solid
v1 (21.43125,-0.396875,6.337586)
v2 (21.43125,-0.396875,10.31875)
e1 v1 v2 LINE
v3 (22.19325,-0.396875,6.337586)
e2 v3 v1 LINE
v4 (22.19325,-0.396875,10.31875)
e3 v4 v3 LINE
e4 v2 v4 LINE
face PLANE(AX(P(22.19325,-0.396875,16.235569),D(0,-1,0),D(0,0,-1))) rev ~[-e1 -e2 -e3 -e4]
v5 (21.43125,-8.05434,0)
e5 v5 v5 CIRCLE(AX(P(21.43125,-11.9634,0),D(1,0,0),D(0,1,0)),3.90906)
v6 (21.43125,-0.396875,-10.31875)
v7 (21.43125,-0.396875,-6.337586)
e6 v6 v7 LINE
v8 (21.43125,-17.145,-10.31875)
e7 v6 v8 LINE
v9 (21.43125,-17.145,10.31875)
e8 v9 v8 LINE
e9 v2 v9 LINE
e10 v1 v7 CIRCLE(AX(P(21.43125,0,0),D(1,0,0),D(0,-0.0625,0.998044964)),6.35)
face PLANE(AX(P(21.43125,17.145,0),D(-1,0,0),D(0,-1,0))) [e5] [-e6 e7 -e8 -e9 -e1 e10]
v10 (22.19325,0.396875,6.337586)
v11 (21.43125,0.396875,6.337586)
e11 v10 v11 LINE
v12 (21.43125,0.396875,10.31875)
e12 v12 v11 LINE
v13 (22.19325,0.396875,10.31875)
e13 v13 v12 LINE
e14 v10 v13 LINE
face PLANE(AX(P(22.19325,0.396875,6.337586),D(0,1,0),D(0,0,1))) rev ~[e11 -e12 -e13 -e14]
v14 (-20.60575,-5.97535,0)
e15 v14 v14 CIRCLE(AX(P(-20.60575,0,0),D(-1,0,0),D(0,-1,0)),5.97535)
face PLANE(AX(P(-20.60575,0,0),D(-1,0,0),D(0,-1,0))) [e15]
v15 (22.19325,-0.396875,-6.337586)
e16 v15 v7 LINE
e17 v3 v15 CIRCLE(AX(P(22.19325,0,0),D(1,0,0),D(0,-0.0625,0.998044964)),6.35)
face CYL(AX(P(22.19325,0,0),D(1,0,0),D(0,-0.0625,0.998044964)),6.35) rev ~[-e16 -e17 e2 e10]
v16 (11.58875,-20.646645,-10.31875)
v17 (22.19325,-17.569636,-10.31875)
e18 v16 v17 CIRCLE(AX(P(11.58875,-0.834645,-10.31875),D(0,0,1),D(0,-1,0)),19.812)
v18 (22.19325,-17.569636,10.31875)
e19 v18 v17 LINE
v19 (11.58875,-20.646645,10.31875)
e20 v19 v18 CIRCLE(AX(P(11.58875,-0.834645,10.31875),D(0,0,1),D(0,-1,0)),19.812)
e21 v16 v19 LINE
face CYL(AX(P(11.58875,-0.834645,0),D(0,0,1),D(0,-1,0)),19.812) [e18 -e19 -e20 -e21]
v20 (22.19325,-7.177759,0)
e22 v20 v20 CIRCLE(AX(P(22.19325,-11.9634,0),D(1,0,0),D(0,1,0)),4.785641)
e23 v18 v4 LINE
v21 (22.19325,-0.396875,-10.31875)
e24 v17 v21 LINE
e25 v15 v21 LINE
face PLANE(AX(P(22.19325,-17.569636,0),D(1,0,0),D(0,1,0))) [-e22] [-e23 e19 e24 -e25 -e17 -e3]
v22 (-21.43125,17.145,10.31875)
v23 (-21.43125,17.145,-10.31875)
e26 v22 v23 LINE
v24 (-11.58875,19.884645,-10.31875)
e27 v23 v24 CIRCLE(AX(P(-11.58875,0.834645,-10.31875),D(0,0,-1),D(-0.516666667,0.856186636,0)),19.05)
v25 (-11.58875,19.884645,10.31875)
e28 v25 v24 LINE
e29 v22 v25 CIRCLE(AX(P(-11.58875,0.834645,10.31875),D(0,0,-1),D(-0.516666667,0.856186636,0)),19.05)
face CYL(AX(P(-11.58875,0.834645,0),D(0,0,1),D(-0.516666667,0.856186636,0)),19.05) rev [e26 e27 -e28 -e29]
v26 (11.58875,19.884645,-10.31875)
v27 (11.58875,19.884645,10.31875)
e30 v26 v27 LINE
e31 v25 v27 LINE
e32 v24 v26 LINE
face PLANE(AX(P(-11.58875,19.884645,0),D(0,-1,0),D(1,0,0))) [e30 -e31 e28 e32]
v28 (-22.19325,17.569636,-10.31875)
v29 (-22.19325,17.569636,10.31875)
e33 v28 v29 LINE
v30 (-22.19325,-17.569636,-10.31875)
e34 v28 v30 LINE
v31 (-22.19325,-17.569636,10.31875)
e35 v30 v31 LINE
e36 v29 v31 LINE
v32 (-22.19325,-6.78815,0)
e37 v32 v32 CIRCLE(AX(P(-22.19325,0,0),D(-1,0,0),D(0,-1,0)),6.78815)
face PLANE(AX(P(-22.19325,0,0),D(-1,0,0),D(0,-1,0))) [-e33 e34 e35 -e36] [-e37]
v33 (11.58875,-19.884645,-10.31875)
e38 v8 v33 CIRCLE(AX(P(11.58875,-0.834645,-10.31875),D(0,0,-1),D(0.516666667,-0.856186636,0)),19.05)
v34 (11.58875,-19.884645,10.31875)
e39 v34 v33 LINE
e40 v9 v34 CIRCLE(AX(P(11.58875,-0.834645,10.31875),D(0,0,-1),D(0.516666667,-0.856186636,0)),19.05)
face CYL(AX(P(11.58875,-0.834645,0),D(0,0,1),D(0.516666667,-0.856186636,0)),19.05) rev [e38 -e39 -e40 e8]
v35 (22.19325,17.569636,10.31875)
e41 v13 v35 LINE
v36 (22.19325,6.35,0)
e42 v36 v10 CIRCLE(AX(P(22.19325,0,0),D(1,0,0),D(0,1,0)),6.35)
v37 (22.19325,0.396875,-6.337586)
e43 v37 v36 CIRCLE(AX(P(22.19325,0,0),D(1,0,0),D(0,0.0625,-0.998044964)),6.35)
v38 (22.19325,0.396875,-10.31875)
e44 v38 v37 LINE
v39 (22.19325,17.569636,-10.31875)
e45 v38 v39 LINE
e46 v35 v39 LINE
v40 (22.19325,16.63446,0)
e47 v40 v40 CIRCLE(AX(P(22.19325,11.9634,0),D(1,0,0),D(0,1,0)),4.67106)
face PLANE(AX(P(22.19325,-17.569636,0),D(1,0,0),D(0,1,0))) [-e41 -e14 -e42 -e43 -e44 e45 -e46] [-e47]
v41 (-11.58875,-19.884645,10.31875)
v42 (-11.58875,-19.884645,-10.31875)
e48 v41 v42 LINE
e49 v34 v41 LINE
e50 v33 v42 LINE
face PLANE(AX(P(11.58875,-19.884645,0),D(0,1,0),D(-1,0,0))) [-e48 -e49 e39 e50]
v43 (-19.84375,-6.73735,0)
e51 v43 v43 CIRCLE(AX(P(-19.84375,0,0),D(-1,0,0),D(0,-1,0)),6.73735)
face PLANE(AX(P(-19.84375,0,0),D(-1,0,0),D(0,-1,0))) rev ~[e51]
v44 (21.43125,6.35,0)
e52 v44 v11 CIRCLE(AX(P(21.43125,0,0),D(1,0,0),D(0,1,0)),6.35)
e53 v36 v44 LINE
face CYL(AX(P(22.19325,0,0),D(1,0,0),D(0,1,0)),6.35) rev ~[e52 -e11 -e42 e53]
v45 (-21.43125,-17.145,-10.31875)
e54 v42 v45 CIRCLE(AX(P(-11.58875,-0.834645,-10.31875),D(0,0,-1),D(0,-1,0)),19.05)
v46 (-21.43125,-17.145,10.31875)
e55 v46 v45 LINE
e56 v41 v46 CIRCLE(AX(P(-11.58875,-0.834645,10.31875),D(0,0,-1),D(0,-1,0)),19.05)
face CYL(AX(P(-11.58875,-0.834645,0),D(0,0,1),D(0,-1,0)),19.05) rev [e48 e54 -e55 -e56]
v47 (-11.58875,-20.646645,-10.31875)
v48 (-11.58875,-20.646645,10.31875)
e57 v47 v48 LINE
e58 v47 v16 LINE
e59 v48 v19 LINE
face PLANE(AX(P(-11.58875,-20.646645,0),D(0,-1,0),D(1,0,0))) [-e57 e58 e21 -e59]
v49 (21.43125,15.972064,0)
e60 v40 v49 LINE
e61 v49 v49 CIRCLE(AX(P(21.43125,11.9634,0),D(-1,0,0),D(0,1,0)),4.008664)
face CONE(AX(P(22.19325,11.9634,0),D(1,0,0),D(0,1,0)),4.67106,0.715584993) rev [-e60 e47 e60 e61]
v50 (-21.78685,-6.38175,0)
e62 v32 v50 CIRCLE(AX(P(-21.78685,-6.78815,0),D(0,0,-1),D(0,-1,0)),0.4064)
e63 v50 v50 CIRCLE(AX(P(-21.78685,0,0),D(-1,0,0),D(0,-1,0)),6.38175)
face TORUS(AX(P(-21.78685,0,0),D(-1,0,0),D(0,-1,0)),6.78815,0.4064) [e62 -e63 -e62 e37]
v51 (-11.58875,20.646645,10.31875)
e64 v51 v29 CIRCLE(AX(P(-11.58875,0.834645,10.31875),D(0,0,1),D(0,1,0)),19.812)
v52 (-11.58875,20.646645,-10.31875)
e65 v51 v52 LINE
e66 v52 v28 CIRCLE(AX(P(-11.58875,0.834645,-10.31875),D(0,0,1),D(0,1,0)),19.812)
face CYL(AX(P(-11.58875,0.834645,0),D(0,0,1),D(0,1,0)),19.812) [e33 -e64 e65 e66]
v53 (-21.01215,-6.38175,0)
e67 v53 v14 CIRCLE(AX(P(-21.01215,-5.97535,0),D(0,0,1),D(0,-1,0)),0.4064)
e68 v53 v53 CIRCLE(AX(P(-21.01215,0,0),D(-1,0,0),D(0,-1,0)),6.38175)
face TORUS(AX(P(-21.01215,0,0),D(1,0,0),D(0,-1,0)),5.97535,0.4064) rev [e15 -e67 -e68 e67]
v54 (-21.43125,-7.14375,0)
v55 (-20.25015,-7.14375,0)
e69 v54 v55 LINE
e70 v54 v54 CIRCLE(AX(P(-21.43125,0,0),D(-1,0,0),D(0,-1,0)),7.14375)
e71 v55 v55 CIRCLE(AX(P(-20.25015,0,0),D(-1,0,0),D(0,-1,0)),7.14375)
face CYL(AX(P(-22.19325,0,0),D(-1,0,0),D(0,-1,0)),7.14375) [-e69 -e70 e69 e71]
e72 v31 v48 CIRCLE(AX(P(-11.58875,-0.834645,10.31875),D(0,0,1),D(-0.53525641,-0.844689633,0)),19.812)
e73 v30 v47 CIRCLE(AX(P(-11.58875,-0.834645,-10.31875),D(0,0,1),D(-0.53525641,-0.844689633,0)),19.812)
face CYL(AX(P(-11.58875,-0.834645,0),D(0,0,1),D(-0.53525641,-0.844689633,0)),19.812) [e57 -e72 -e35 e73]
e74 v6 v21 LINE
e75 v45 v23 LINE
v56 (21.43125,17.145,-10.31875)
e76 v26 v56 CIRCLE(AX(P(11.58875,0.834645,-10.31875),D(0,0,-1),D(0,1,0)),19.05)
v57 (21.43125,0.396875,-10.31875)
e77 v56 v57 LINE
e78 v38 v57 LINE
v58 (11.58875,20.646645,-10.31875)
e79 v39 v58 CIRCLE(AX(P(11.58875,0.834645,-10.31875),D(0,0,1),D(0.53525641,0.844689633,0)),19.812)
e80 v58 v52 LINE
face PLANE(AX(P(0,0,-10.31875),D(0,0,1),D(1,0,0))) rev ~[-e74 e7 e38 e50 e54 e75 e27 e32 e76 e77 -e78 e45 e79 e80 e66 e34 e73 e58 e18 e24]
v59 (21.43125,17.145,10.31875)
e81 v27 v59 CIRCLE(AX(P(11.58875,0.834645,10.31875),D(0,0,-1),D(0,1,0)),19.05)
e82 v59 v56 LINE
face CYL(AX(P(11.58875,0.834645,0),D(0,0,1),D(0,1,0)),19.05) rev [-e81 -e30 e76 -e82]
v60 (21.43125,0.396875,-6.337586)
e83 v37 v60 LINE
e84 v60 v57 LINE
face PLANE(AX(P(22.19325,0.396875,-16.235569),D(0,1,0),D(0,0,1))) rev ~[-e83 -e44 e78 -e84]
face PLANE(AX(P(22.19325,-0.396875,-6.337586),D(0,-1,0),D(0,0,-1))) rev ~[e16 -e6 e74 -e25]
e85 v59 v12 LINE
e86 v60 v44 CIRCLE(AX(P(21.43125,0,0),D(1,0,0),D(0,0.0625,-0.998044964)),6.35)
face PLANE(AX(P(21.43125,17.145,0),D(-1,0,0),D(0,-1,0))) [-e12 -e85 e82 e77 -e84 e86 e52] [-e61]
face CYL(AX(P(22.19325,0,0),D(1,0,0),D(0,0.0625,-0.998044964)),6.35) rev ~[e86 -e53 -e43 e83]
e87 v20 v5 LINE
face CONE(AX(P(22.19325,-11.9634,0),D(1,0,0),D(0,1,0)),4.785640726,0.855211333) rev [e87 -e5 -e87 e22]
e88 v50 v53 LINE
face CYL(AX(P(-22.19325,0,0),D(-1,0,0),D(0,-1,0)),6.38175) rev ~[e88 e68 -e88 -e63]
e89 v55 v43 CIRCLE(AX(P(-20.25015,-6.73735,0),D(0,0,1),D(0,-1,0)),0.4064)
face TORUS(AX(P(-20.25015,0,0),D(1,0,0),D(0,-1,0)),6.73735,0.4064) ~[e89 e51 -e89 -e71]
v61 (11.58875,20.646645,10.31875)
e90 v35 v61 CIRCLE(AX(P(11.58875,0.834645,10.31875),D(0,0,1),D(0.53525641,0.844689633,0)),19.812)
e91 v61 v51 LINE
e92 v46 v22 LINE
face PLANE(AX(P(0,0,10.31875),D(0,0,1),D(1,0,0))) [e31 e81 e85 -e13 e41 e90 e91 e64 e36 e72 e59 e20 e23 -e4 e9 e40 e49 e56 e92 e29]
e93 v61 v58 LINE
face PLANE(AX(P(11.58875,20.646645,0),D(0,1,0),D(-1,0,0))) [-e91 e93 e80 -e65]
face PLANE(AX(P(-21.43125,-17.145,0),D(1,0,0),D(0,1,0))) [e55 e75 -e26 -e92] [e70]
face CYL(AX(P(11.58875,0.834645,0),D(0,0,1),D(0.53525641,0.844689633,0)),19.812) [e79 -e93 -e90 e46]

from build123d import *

# Parameters (mm, degrees)
F1_DEPTH = 10.31875
F2_R     = 3.90906
F3_DEPTH = 25.4
F4_DEPTH = 25.4
F6_R     = 7.14375
F7_DEPTH = 2.3495
F8_R     = 6.38175
F9_DEPTH = 1.5875
F10_R    = 0.4064


# Not quite as in the source:
# - a fillet or chamfer that OpenCascade refuses, or shapes differently, is made with other operations: its cross-section is extruded or revolved along the edge and cut away or added


with BuildPart() as f1:
    # F0 (on Top) → F1 (new body, symmetric)
    with BuildSketch(Plane.XY):
        with BuildLine():
            Line((0, 20.6466445854), (-11.58875, 20.6466445854))
            ThreePointArc((-11.58875, 20.6466445854), (-17.1096965819, 19.861848606), (-22.19325, 17.5696355848))
            Line((-22.19325, 17.5696355848), (-22.19325, -17.5696355848))
            ThreePointArc((-22.19325, -17.5696355848), (-17.1096965819, -19.861848606), (-11.58875, -20.6466445854))
            Line((-11.58875, -20.6466445854), (0, -20.6466445854))
            Line((0, -20.6466445854), (11.58875, -20.6466445854))
            ThreePointArc((11.58875, -20.6466445854), (17.1096965819, -19.861848606), (22.19325, -17.5696355848))
            Line((22.19325, -17.5696355848), (22.19325, 17.5696355848))
            ThreePointArc((22.19325, 17.5696355848), (17.1096965819, 19.861848606), (11.58875, 20.6466445854))
            Line((11.58875, 20.6466445854), (0, 20.6466445854))
        make_face()
        with BuildLine():
            ThreePointArc((11.58875, 19.8846445854), (16.6970877606, 19.1869573913), (21.43125, 17.145))
            Line((21.43125, 17.145), (21.43125, -17.145))
            ThreePointArc((21.43125, -17.145), (16.6970877606, -19.1869573913), (11.58875, -19.8846445854))
            Line((11.58875, -19.8846445854), (0, -19.8846445854))
            Line((0, -19.8846445854), (-11.58875, -19.8846445854))
            ThreePointArc((-11.58875, -19.8846445854), (-16.6970877606, -19.1869573913), (-21.43125, -17.145))
            Line((-21.43125, -17.145), (-21.43125, 17.145))
            ThreePointArc((-21.43125, 17.145), (-16.6970877606, 19.1869573913), (-11.58875, 19.8846445854))
            Line((-11.58875, 19.8846445854), (0, 19.8846445854))
            Line((0, 19.8846445854), (11.58875, 19.8846445854))
        make_face(mode=Mode.SUBTRACT)
    extrude(amount=F1_DEPTH, both=True)

    # F2 (on face) → F3 (cut)
    with BuildSketch(Plane.YZ.offset(22.19325)):
        with BuildLine():
            ThreePointArc((0.396875, -6.3375855209), (4.6283180665, -4.3475478002), (6.35, 0))
            ThreePointArc((6.35, 0), (4.6283180665, 4.3475478002), (0.396875, 6.3375855209))
            Line((0.396875, 6.3375855209), (0.396875, -6.3375855209))
        make_face()
        with BuildLine():
            Line((0.396875, -6.3375855209), (0.396875, 6.3375855209))
            ThreePointArc((0.396875, 6.3375855209), (0, 6.35), (-0.396875, 6.3375855209))
            Line((-0.396875, 6.3375855209), (-0.396875, -6.3375855209))
            ThreePointArc((-0.396875, -6.3375855209), (0, -6.35), (0.396875, -6.3375855209))
        make_face()
        with BuildLine():
            ThreePointArc((-0.396875, 6.3375855209), (0, 6.35), (0.396875, 6.3375855209))
            Line((0.396875, 6.3375855209), (0.396875, 16.235569492))
            Line((0.396875, 16.235569492), (-0.396875, 16.235569492))
            Line((-0.396875, 16.235569492), (-0.396875, 6.3375855209))
        make_face()
        with BuildLine():
            Line((0.396875, -16.235569492), (0.396875, -6.3375855209))
            ThreePointArc((0.396875, -6.3375855209), (0, -6.35), (-0.396875, -6.3375855209))
            Line((-0.396875, -6.3375855209), (-0.396875, -16.235569492))
            Line((-0.396875, -16.235569492), (0.396875, -16.235569492))
        make_face()
        with BuildLine():
            Line((-0.396875, -6.3375855209), (-0.396875, 6.3375855209))
            ThreePointArc((-0.396875, 6.3375855209), (-6.35, 0), (-0.396875, -6.3375855209))
        make_face()
        with Locations((-11.9634, 0)):
            Circle(F2_R)
        with Locations((11.9634, 0)):
            Circle(F2_R)
    extrude(amount=-F3_DEPTH, mode=Mode.SUBTRACT)

    # F2 (on face) → F4 (cut)
    with BuildSketch(Plane.YZ.offset(22.19325)):
        with BuildLine():
            ThreePointArc((0.396875, -6.3375855209), (4.6283180665, -4.3475478002), (6.35, 0))
            ThreePointArc((6.35, 0), (4.6283180665, 4.3475478002), (0.396875, 6.3375855209))
            Line((0.396875, 6.3375855209), (0.396875, -6.3375855209))
        make_face()
        with BuildLine():
            Line((0.396875, -6.3375855209), (0.396875, 6.3375855209))
            ThreePointArc((0.396875, 6.3375855209), (0, 6.35), (-0.396875, 6.3375855209))
            Line((-0.396875, 6.3375855209), (-0.396875, -6.3375855209))
            ThreePointArc((-0.396875, -6.3375855209), (0, -6.35), (0.396875, -6.3375855209))
        make_face()
        with BuildLine():
            ThreePointArc((-0.396875, 6.3375855209), (0, 6.35), (0.396875, 6.3375855209))
            Line((0.396875, 6.3375855209), (0.396875, 16.235569492))
            Line((0.396875, 16.235569492), (-0.396875, 16.235569492))
            Line((-0.396875, 16.235569492), (-0.396875, 6.3375855209))
        make_face()
        with BuildLine():
            Line((0.396875, -16.235569492), (0.396875, -6.3375855209))
            ThreePointArc((0.396875, -6.3375855209), (0, -6.35), (-0.396875, -6.3375855209))
            Line((-0.396875, -6.3375855209), (-0.396875, -16.235569492))
            Line((-0.396875, -16.235569492), (0.396875, -16.235569492))
        make_face()
        with BuildLine():
            Line((-0.396875, -6.3375855209), (-0.396875, 6.3375855209))
            ThreePointArc((-0.396875, 6.3375855209), (-6.35, 0), (-0.396875, -6.3375855209))
        make_face()
        with Locations((-11.9634, 0)):
            Circle(F2_R)
        with Locations((11.9634, 0)):
            Circle(F2_R)
    extrude(amount=-F4_DEPTH, mode=Mode.SUBTRACT)

    # F5: chamfer of 0.762 x 0.8765807263 on 2 edges, made by hand

    # F5_s1 → F5_t2 (revolve, cut)
    with BuildSketch(Plane.XY):
        Polygon((22.19325, -7.1777592737), (21.43125, -8.05434), (22.19325, -8.05434), align=None)
    revolve(axis=Axis((22.19325, -11.9634, 0), (1, 0, 0)), mode=Mode.SUBTRACT)

    # F5_s3 → F5_t4 (revolve, cut)
    with BuildSketch(Plane.XY):
        Polygon((22.19325, 16.63446), (21.3166692737, 15.87246), (22.19325, 15.87246), align=None)
    revolve(axis=Axis((22.19325, 11.9634, 0), (1, 0, 0)), mode=Mode.SUBTRACT)

    # F6 (on face) → F7 (join)
    with BuildSketch(Plane(origin=(-22.19325, 0, 0), x_dir=(0, -1, 0), z_dir=(-1, 0, 0))):
        Circle(F6_R)
    extrude(amount=-F7_DEPTH)

    # F8 (on face) → F9 (cut)
    with BuildSketch(Plane(origin=(-22.19325, 0, 0), x_dir=(0, -1, 0), z_dir=(-1, 0, 0))):
        Circle(F8_R)
    extrude(amount=-F9_DEPTH, mode=Mode.SUBTRACT)

    # F10
    f10_edges = [f1.edges().sort_by_distance(p)[0] for p in [
        (-22.19325, 6.38175, 0),
        (-20.60575, 6.38175, 0),
        (-19.84375, 7.14375, 0),
    ]]
    fillet(f10_edges, radius=F10_R)


solid = f1.part
